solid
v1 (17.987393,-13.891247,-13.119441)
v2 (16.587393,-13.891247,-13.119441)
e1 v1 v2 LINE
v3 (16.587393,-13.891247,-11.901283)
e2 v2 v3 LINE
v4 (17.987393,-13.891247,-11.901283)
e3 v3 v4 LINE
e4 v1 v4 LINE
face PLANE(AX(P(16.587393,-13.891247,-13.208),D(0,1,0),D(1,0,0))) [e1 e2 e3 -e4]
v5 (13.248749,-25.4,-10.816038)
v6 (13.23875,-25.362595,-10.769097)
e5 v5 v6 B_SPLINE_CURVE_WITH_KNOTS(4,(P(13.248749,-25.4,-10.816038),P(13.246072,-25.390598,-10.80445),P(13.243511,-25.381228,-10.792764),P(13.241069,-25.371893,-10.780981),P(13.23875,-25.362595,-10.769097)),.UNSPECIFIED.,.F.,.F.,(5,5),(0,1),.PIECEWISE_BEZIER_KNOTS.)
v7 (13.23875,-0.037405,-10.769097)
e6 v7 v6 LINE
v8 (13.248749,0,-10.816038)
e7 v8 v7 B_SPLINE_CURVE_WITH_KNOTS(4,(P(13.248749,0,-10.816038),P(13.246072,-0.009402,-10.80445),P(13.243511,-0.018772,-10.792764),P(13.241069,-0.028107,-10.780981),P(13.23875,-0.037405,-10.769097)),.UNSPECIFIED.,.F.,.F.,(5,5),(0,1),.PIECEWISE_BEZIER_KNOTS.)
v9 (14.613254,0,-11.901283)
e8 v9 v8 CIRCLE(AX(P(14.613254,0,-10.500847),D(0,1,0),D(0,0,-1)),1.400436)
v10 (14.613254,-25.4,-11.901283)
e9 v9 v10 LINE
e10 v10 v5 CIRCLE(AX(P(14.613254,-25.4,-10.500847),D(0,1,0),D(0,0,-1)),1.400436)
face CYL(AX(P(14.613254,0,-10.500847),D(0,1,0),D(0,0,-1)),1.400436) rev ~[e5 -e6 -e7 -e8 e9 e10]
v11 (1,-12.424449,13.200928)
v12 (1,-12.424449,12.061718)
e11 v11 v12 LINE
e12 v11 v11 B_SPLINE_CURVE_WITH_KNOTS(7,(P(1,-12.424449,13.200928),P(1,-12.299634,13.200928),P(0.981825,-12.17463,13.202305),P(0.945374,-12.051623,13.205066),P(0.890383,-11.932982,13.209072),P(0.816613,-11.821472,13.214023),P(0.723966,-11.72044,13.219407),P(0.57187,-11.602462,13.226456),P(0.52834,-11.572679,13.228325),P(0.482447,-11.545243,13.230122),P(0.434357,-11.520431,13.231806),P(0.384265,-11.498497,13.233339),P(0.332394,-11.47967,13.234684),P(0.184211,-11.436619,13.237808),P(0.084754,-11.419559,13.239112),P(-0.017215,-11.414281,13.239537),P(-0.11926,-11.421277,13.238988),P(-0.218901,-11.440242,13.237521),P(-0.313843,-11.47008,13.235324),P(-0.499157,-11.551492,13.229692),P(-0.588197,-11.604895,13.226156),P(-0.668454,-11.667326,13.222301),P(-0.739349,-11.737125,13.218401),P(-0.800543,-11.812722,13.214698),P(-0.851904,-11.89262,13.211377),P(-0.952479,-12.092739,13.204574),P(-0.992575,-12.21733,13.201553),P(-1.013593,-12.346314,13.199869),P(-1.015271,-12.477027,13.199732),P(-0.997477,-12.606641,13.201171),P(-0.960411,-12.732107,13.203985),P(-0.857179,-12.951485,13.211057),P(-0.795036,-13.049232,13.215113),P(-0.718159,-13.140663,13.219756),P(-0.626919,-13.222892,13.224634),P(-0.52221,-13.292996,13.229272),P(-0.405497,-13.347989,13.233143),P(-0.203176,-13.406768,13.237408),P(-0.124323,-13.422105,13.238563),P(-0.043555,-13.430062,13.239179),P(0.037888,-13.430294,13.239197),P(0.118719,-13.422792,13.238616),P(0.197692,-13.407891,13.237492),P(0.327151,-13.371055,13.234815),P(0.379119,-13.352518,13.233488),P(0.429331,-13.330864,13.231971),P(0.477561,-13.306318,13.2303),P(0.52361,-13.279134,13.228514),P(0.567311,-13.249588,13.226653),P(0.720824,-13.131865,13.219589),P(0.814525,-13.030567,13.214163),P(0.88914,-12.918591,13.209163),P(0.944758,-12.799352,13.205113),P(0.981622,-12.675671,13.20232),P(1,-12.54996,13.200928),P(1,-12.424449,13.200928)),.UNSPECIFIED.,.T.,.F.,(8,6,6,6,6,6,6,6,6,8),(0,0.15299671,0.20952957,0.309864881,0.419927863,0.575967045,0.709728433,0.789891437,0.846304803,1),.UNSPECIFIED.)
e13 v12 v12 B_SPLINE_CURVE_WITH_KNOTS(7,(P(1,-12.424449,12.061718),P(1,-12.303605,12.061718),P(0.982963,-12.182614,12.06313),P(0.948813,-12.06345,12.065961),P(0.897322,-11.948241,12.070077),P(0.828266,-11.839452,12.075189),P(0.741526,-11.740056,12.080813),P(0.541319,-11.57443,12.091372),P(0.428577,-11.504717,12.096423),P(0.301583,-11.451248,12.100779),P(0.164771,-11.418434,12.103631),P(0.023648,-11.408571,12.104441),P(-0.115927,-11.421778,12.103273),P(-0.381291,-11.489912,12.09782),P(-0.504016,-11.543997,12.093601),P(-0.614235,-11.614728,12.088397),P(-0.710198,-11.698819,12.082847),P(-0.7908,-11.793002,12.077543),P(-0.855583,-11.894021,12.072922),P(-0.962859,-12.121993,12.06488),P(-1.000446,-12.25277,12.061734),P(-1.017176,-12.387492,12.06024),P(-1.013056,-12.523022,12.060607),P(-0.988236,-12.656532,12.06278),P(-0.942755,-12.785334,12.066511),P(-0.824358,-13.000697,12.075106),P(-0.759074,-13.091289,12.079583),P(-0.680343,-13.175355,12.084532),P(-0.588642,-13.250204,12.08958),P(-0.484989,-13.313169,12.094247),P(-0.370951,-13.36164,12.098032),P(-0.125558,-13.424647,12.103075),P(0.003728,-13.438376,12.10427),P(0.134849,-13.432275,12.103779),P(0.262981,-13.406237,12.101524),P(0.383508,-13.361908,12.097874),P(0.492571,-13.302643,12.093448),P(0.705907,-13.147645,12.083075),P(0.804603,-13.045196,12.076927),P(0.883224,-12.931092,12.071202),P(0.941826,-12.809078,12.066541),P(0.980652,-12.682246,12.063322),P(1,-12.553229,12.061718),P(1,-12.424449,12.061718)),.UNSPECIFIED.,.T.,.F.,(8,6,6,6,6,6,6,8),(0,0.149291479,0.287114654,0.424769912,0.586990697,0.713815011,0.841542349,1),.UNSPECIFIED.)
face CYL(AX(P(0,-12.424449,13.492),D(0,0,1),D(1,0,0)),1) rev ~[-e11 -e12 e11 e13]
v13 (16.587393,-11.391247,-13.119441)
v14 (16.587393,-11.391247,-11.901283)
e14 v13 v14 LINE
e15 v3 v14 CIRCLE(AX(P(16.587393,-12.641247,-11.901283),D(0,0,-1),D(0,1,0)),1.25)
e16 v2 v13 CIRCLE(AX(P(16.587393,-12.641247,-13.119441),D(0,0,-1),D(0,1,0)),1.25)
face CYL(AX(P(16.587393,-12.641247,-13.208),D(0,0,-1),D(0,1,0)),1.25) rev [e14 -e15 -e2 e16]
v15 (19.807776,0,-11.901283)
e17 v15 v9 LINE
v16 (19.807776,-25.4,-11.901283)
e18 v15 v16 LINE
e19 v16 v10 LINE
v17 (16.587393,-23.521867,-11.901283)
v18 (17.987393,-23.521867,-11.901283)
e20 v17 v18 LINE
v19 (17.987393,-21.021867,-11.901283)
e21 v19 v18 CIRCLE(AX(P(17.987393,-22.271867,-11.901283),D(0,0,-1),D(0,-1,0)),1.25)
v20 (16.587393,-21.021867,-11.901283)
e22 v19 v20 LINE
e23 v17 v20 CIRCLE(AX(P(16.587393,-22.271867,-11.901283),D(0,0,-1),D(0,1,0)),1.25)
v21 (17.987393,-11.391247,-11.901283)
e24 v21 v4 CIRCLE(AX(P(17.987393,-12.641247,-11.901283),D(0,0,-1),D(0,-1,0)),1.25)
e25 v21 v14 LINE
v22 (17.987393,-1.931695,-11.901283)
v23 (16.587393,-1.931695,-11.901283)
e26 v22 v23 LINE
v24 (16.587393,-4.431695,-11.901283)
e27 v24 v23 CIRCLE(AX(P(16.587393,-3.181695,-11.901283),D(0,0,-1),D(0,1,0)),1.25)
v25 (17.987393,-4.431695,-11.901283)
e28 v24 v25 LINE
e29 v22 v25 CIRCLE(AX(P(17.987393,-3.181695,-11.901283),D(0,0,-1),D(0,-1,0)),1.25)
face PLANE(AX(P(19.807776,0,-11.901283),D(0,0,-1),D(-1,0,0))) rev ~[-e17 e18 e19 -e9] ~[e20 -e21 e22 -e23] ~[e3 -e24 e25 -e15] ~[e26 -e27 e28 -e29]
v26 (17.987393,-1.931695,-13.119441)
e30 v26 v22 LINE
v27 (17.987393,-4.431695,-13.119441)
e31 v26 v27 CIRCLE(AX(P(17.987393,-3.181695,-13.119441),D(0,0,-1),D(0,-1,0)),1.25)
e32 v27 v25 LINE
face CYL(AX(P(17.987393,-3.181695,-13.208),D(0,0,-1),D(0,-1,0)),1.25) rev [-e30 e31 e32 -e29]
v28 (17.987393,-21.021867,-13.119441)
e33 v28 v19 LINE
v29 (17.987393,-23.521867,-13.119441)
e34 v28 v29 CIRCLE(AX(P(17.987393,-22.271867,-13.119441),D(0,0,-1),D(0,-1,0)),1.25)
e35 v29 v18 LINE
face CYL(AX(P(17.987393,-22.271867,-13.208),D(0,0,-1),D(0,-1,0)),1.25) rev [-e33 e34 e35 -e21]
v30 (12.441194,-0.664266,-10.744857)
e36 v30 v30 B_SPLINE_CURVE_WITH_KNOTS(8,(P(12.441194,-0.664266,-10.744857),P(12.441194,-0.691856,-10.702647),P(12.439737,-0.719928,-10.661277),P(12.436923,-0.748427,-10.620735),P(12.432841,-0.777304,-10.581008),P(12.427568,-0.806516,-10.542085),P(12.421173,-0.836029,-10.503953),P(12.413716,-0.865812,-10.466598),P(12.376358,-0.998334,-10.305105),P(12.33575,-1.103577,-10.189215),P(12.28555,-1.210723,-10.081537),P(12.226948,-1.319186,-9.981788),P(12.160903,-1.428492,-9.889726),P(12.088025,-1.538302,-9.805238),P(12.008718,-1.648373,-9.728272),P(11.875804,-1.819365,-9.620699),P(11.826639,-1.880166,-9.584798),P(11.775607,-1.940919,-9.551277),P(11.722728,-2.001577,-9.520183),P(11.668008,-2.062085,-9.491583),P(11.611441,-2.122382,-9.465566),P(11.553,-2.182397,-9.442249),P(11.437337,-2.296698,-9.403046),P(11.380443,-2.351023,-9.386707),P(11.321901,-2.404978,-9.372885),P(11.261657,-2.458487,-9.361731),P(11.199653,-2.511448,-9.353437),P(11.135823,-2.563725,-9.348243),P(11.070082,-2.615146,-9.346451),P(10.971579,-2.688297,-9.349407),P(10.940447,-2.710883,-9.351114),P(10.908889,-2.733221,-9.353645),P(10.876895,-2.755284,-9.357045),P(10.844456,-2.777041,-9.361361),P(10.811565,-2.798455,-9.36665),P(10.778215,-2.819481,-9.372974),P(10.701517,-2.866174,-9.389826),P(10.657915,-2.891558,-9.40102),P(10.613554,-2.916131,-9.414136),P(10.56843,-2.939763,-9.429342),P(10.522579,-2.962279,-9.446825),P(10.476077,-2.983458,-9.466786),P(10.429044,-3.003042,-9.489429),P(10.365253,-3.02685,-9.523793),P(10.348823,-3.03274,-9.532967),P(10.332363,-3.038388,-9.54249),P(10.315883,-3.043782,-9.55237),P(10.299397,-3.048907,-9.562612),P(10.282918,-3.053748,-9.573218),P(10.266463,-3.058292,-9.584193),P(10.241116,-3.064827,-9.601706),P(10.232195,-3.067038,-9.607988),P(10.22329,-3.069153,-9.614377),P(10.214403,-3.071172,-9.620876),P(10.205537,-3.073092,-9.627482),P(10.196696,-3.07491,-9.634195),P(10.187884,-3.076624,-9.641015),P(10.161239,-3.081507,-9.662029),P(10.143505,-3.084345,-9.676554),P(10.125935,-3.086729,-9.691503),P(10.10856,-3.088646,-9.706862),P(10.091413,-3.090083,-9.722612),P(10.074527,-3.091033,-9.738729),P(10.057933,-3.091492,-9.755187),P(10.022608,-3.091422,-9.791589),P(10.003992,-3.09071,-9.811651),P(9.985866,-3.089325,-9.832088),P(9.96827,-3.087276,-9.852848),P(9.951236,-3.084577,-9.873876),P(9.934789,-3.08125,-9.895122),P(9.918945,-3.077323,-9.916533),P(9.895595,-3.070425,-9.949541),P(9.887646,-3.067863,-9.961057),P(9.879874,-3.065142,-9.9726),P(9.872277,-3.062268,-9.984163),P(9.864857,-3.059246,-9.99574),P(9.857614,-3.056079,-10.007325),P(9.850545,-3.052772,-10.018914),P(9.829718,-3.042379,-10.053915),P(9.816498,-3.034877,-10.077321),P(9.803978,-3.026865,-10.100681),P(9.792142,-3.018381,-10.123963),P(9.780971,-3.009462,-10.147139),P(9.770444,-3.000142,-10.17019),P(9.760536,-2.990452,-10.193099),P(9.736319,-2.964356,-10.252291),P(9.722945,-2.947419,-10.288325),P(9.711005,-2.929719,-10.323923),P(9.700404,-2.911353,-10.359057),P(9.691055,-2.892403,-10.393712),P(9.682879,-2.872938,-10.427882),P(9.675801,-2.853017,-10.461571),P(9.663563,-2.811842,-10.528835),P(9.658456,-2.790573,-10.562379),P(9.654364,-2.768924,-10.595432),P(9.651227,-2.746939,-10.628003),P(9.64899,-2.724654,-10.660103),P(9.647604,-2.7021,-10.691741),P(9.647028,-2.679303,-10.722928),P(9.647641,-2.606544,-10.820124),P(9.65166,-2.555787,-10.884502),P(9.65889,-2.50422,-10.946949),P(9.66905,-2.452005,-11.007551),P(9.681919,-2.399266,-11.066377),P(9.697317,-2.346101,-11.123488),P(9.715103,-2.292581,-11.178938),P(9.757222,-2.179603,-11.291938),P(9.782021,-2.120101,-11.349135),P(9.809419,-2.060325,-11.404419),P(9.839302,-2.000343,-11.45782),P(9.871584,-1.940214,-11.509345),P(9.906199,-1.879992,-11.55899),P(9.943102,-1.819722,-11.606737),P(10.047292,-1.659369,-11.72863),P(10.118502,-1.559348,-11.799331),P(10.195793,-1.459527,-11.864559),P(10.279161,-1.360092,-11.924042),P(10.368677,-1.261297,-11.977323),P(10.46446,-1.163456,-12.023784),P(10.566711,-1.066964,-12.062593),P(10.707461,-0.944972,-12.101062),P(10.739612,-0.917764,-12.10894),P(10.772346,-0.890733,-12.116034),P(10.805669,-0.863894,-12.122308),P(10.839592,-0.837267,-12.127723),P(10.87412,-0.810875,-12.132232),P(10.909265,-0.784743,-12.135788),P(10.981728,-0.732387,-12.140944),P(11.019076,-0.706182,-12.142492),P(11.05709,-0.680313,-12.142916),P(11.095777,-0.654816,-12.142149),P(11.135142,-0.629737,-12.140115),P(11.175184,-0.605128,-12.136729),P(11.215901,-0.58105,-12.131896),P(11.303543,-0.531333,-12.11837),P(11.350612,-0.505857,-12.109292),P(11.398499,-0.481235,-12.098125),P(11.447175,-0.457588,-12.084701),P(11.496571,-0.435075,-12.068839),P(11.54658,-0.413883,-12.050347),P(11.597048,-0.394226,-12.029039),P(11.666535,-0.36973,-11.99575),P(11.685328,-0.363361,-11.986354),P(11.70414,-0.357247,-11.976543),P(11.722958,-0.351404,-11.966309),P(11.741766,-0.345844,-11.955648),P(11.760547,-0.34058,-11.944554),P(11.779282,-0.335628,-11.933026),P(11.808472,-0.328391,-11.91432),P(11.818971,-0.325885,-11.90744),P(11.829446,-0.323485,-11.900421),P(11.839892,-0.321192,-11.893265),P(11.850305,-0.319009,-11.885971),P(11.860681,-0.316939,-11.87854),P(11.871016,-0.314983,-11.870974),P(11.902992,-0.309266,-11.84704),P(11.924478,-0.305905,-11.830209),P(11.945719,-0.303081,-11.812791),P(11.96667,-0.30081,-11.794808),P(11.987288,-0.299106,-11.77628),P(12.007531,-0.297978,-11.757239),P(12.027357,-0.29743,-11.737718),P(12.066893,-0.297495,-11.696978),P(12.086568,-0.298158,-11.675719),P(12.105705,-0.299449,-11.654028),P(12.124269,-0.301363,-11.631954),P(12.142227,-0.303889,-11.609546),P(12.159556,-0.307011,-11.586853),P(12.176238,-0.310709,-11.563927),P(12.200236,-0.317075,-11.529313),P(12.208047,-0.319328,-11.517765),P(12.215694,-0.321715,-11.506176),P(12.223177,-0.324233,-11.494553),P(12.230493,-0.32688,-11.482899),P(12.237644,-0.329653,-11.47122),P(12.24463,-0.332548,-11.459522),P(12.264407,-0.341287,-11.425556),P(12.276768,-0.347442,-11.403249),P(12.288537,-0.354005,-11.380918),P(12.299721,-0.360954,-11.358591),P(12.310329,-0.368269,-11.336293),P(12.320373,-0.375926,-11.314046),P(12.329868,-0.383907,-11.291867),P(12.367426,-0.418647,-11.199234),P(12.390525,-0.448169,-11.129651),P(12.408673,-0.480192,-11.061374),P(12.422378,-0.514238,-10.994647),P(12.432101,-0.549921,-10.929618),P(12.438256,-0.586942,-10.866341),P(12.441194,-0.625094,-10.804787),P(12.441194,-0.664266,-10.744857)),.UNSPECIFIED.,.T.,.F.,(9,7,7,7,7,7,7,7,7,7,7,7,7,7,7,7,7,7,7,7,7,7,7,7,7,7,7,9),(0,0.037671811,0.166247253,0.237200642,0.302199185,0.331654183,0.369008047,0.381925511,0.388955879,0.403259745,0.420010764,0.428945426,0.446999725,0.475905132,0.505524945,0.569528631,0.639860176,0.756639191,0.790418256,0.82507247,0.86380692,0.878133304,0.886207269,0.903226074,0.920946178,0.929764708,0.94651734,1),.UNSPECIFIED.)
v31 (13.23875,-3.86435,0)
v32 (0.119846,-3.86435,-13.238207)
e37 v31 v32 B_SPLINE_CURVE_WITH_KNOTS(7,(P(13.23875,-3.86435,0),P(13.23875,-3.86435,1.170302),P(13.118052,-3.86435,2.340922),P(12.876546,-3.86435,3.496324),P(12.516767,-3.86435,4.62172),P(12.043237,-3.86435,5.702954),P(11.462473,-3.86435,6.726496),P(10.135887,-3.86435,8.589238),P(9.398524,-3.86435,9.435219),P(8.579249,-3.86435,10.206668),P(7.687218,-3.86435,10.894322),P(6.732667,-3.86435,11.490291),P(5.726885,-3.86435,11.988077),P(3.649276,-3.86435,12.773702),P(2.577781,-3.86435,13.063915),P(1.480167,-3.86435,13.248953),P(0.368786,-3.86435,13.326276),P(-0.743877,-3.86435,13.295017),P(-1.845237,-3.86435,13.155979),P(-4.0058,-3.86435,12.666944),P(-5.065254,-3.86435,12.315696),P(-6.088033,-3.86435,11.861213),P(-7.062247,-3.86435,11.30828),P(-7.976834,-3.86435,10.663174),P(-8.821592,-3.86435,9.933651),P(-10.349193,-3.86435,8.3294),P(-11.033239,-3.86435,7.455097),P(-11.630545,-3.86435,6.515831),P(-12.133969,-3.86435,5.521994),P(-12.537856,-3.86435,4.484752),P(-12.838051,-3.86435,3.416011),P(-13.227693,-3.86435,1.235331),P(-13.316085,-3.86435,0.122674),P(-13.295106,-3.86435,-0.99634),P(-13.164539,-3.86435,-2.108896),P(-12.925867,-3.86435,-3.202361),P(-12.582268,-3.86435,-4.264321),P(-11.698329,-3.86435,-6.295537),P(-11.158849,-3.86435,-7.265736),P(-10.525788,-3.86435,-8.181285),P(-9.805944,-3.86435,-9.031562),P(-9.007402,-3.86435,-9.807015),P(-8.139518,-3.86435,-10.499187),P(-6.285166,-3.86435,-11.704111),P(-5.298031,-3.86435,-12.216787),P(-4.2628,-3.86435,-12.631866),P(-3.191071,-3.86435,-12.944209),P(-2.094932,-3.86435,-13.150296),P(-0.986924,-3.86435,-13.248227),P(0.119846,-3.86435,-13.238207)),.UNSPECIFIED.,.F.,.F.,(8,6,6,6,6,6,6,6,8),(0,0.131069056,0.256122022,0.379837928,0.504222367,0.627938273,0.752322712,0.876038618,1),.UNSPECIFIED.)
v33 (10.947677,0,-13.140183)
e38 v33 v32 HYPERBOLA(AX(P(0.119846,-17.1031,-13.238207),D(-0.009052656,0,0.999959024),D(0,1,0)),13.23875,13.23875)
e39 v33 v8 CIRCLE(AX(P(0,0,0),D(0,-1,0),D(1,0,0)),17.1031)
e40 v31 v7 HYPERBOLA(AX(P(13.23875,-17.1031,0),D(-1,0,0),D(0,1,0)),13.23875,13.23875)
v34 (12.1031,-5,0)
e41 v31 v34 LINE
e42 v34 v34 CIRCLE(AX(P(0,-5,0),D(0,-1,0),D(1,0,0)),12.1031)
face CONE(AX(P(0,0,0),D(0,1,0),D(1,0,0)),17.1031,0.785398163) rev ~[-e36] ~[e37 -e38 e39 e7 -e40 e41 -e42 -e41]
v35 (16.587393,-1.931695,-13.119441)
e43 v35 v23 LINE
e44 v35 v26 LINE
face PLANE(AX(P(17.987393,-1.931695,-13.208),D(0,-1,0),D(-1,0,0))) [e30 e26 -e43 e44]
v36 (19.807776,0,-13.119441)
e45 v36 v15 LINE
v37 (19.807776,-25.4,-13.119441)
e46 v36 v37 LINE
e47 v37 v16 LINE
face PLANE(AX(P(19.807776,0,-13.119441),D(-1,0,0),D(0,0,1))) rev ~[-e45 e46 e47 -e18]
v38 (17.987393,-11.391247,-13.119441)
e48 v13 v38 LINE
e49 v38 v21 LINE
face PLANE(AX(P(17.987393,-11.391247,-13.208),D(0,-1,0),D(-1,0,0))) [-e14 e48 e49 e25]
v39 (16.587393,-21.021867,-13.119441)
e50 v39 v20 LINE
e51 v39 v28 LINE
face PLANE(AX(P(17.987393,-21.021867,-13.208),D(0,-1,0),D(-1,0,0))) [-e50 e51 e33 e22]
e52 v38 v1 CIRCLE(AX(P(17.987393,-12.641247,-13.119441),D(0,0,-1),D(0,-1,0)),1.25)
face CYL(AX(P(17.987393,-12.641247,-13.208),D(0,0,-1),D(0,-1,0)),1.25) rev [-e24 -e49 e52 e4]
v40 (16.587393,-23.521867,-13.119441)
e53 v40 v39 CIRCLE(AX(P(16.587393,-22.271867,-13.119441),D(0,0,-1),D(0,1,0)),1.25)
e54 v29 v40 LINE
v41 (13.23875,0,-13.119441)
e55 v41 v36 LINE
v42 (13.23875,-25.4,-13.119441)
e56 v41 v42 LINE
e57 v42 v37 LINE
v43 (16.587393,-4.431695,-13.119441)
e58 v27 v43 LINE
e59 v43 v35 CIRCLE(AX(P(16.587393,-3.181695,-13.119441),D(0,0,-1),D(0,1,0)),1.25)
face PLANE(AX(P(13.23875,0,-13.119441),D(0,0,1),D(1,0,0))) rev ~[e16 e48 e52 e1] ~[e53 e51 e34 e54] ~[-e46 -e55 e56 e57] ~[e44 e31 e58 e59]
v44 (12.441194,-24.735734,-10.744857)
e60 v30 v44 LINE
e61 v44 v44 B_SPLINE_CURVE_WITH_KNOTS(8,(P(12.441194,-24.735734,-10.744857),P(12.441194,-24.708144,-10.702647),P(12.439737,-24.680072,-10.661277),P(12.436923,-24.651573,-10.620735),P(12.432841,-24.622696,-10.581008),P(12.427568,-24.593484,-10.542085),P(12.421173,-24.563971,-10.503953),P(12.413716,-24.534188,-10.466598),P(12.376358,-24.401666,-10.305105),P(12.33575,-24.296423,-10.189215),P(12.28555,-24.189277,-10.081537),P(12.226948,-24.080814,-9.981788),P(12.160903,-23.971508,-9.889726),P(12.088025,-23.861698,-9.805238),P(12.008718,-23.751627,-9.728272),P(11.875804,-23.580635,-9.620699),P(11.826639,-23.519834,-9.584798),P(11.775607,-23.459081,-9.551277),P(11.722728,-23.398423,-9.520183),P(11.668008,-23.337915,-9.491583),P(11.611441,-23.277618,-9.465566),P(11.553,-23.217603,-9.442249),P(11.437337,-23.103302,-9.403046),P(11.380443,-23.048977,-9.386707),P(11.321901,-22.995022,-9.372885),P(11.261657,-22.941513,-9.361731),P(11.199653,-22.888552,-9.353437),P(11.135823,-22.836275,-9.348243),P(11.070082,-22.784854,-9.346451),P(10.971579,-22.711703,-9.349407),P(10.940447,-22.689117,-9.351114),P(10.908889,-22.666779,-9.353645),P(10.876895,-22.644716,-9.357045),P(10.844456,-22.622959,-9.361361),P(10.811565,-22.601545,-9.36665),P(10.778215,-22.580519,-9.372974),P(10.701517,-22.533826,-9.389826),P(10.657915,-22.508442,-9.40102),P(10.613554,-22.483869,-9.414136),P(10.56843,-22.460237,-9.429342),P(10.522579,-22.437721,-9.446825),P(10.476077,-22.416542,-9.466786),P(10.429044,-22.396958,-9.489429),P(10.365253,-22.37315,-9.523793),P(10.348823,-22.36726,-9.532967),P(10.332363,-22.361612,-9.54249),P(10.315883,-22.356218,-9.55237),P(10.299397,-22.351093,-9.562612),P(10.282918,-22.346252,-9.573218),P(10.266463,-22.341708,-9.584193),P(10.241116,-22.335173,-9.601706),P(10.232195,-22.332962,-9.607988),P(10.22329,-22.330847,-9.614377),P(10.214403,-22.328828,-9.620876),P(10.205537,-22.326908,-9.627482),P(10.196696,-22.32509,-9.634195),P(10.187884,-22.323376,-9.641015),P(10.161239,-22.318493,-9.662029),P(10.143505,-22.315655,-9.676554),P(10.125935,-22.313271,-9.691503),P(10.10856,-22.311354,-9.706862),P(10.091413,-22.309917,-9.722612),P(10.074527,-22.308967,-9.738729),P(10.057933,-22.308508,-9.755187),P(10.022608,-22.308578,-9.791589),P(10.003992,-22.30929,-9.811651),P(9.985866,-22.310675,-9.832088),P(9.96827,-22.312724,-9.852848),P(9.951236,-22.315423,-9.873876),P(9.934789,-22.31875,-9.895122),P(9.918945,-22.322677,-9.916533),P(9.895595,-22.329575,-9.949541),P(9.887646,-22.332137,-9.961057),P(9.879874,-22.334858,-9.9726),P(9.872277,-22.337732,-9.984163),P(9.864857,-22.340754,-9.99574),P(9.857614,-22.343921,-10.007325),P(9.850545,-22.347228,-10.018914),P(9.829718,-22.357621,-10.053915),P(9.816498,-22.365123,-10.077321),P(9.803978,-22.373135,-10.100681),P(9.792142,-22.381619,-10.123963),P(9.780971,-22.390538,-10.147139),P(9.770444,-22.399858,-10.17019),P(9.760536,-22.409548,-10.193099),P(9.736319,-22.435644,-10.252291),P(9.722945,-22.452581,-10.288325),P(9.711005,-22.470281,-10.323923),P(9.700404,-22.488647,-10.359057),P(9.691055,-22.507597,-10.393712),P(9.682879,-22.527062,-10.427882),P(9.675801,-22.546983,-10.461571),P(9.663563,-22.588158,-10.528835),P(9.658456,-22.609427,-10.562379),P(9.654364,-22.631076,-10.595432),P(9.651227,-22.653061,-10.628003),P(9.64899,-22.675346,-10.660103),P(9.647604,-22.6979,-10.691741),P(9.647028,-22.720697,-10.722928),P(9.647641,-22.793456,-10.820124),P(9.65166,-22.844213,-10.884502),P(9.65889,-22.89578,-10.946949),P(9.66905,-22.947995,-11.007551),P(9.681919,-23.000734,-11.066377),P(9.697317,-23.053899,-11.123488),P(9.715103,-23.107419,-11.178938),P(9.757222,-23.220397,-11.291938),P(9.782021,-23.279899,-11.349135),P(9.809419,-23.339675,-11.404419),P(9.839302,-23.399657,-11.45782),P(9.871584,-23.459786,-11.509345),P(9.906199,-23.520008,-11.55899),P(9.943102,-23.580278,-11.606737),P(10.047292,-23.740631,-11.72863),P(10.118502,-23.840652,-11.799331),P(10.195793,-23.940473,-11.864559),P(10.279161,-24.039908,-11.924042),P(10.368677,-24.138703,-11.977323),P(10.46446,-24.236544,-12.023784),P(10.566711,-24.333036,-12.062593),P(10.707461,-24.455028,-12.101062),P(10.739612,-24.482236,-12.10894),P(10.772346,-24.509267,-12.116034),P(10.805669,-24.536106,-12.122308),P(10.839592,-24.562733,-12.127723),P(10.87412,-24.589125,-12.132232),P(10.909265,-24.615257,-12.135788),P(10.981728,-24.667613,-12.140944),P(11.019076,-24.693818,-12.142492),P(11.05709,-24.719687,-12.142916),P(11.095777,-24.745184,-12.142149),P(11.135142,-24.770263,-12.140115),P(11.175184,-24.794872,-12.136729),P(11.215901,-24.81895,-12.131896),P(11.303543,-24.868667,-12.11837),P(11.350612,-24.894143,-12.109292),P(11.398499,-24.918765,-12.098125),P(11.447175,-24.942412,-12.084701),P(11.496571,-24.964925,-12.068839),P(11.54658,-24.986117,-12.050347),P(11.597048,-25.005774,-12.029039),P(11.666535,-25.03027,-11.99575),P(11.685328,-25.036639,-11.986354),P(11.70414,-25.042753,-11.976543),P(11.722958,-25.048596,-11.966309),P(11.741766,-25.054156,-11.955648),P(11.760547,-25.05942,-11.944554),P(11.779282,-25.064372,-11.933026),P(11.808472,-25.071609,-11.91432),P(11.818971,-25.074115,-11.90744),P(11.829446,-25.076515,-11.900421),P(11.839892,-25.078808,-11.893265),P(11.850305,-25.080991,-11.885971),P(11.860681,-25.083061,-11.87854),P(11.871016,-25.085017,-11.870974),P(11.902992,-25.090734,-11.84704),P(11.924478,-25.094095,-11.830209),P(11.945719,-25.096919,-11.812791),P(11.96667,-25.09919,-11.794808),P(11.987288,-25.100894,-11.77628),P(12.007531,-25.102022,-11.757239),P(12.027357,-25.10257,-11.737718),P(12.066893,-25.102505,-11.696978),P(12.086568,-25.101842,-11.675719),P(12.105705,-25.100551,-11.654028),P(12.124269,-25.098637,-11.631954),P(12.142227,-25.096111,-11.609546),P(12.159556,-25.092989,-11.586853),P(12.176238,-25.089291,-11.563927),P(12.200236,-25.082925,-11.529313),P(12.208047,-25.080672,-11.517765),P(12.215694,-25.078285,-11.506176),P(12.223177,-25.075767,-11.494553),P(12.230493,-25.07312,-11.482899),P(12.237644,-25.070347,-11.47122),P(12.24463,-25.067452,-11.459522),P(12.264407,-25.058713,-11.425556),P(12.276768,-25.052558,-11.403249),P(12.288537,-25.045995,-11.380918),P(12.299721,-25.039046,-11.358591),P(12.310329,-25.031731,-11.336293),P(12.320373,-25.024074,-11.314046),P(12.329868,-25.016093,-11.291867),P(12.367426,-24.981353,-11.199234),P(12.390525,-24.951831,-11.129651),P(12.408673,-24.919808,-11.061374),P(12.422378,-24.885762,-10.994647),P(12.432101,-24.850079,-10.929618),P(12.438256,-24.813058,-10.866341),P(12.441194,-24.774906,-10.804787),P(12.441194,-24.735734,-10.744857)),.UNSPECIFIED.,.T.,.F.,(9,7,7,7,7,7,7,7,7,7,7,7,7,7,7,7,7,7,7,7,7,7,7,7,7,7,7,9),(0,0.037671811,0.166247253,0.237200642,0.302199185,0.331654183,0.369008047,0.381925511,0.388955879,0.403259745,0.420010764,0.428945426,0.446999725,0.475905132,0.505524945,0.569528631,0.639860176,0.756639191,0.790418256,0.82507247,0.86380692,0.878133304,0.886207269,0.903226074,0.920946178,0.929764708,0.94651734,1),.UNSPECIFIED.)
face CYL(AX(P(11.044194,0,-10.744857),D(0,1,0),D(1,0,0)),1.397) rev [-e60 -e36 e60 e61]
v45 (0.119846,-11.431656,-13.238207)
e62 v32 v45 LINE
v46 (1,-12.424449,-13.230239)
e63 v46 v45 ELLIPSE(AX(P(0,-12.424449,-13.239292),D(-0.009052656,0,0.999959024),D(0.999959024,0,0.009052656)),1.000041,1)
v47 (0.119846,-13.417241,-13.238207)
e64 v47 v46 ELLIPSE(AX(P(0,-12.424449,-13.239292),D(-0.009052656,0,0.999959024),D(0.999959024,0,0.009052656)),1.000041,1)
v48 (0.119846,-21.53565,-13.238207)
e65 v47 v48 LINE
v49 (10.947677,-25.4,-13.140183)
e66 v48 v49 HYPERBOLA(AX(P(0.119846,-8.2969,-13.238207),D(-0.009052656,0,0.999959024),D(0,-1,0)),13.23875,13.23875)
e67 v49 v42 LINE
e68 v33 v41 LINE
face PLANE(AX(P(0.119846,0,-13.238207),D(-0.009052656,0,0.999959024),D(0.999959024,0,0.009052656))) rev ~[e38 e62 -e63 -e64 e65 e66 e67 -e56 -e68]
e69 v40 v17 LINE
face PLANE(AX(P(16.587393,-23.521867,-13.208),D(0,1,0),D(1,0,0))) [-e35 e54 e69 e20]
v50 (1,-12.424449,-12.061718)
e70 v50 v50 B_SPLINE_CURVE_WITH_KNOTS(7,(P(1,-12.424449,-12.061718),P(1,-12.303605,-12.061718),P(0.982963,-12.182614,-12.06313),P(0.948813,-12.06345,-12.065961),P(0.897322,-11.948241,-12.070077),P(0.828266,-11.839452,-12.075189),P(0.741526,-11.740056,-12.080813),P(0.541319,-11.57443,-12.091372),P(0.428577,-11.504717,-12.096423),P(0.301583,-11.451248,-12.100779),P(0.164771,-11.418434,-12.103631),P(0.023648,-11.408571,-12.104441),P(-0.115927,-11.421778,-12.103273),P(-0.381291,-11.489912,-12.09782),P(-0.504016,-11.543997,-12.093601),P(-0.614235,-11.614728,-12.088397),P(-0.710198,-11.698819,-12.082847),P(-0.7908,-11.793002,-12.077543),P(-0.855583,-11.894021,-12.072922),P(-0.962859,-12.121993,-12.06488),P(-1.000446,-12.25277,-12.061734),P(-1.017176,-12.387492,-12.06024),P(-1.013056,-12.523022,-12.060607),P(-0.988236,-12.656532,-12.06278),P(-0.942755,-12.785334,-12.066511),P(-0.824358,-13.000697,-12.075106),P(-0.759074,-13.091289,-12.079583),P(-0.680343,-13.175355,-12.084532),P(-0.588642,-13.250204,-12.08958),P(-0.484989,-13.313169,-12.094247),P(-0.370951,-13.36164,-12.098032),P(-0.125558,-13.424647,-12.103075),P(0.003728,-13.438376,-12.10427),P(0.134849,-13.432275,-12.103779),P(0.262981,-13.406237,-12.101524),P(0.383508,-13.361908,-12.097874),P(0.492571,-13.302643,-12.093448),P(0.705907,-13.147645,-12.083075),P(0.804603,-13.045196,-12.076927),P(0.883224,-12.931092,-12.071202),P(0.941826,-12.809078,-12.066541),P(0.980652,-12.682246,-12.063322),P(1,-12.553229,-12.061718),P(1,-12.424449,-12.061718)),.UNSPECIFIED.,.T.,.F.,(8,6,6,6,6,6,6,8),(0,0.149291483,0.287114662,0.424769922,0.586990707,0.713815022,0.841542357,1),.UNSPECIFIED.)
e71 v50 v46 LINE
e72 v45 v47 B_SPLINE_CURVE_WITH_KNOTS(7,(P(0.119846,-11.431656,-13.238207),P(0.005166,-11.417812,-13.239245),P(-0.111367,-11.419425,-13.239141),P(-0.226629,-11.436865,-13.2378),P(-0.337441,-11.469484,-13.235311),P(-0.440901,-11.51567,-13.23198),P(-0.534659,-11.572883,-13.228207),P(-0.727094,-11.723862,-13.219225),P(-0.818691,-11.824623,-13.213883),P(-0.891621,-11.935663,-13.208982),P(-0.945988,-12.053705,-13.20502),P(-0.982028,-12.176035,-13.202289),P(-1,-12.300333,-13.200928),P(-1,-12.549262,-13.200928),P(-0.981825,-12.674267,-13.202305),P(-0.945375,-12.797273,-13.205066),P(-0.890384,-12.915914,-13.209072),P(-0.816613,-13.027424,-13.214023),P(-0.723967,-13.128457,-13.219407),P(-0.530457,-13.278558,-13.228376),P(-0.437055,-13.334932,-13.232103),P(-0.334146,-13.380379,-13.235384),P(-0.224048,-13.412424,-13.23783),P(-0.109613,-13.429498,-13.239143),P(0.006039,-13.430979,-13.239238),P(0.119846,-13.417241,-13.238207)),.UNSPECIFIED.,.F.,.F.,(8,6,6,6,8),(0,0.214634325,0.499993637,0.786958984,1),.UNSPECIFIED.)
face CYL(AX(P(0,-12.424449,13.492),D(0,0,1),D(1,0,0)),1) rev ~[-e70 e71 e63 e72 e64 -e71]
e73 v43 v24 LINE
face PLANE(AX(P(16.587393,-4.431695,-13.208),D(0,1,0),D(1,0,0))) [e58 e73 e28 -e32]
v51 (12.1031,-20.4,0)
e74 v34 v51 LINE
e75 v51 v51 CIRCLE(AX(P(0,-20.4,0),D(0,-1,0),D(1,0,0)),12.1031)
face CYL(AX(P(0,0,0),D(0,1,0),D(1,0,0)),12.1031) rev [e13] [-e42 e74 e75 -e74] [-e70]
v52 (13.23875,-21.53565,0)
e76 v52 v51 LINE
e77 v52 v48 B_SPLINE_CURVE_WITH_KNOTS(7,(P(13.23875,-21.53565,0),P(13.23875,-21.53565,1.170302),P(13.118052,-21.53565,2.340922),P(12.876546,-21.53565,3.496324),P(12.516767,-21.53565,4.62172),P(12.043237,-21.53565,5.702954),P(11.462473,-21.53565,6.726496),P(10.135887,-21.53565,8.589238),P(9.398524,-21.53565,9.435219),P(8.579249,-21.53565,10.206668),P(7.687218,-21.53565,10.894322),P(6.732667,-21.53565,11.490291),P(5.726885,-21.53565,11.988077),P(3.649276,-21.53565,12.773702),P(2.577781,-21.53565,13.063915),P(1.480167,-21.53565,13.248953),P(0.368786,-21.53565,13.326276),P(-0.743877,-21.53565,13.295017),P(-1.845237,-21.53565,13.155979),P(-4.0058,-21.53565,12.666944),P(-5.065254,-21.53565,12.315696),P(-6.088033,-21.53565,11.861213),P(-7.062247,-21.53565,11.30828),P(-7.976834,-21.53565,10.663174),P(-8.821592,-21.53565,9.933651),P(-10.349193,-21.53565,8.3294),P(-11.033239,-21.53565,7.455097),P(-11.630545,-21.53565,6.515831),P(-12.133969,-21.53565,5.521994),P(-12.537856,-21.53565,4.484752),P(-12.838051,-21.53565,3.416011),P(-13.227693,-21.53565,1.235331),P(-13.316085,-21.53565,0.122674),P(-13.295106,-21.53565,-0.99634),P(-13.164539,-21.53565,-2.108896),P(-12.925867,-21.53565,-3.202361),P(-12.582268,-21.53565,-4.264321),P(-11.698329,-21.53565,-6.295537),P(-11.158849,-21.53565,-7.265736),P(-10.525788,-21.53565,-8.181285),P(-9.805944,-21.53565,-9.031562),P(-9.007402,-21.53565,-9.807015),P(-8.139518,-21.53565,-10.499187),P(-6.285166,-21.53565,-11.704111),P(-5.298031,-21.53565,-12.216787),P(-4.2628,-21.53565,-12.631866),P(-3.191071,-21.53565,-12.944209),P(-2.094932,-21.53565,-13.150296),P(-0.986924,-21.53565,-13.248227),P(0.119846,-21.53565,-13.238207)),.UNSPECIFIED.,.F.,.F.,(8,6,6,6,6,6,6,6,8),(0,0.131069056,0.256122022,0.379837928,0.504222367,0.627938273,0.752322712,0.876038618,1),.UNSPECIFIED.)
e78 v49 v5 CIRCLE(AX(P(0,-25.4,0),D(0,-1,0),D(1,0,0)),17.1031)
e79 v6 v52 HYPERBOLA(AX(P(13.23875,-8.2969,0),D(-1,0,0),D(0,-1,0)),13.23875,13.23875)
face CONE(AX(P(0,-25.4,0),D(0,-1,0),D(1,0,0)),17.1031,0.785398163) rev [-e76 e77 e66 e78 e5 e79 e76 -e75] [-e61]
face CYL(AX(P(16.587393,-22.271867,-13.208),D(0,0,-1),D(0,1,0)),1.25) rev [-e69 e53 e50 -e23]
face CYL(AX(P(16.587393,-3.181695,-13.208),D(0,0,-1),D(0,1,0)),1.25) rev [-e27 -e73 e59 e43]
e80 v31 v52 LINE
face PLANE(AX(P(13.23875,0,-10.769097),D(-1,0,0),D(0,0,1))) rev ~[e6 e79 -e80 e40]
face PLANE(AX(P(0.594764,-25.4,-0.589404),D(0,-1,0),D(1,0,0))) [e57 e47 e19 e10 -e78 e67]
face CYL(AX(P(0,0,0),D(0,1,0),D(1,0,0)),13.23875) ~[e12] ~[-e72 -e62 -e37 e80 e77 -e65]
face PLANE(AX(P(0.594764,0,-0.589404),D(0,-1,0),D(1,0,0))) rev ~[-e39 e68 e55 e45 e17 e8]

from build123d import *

# Parameters (mm, degrees)
F0_R     = 12.1031
F0_R_2   = 1.397
F1_DEPTH = 25.4
F4_DEPTH = 1.7
F8_R     = 1
F9_DEPTH = 27.8


# Not quite as in the source:
# - a fillet or chamfer that OpenCascade refuses, or shapes differently, is made with other operations: its cross-section is extruded or revolved along the edge and cut away or added


with BuildPart() as f1:
    # F0 (on Front) → F1 (new body)
    with BuildSketch(Plane.XZ):
        with BuildLine():
            ThreePointArc((0.1198459876, -13.2382072509), (9.403486197, -9.3187414184), (13.2387497249, 0))
            ThreePointArc((13.2387497249, 0), (-9.403486197, 9.3187414184), (0.1198459876, -13.2382072509))
        make_face()
        Circle(F0_R, mode=Mode.SUBTRACT)
        with BuildLine():
            Line((13.2387497249, -10.7690971345), (13.2387497249, 0))
            ThreePointArc((13.2387497249, 0), (9.403486197, -9.3187414184), (0.1198459876, -13.2382072509))
            Line((0.1198459876, -13.2382072509), (13.2387497249, -13.1194414571))
            Line((13.2387497249, -13.1194414571), (13.2387497249, -10.7690971345))
        make_face()
        with Locations((11.0441939905, -10.7448566705)):
            Circle(F0_R_2, mode=Mode.SUBTRACT)
        with BuildLine():
            ThreePointArc((14.6132539958, -11.9012827054), (13.7228739986, -11.5817927037), (13.2387497249, -10.7690971345))
            Line((13.2387497249, -10.7690971345), (13.2387497249, -13.1194414571))
            Line((13.2387497249, -13.1194414571), (19.8077764362, -13.1194414571))
            Line((19.8077764362, -13.1194414571), (19.8077764362, -11.9012827054))
            Line((19.8077764362, -11.9012827054), (14.6132539958, -11.9012827054))
        make_face()
    extrude(amount=F1_DEPTH)

    # F3 (on offset) → F4 (cut)
    with BuildSketch(Plane.XY.offset(-13.208)):
        with BuildLine():
            Line((16.5873928428, -4.4316952396), (17.9873928428, -4.4316952396))
            ThreePointArc((17.9873928428, -4.4316952396), (19.2373928428, -3.1816952396), (17.9873928428, -1.9316952396))
            Line((17.9873928428, -1.9316952396), (16.5873928428, -1.9316952396))
            ThreePointArc((16.5873928428, -1.9316952396), (15.3373928428, -3.1816952396), (16.5873928428, -4.4316952396))
        make_face()
        with BuildLine():
            Line((16.5873928428, -13.8912473619), (17.9873928428, -13.8912473619))
            ThreePointArc((17.9873928428, -13.8912473619), (19.2373928428, -12.6412473619), (17.9873928428, -11.3912473619))
            Line((17.9873928428, -11.3912473619), (16.5873928428, -11.3912473619))
            ThreePointArc((16.5873928428, -11.3912473619), (15.3373928428, -12.6412473619), (16.5873928428, -13.8912473619))
        make_face()
        with BuildLine():
            Line((16.5873928428, -23.5218666773), (17.9873928428, -23.5218666773))
            ThreePointArc((17.9873928428, -23.5218666773), (19.2373928428, -22.2718666773), (17.9873928428, -21.0218666773))
            Line((17.9873928428, -21.0218666773), (16.5873928428, -21.0218666773))
            ThreePointArc((16.5873928428, -21.0218666773), (15.3373928428, -22.2718666773), (16.5873928428, -23.5218666773))
        make_face()
    extrude(amount=F4_DEPTH, mode=Mode.SUBTRACT)

    # F5: chamfer of 5 on 1 edges, made by hand

    # F5_s1 → F5_t2 (revolve, cut)
    with BuildSketch(Plane.XY):
        Polygon((17.1031, -25.4), (12.1031, -20.4), (12.1031, -25.4), align=None)
    revolve(axis=Axis((0, -25.4, 0), (0, -1, 0)), mode=Mode.SUBTRACT)

    # F6: chamfer of 5 on 1 edges, made by hand

    # F6_s1 → F6_t2 (revolve, cut)
    with BuildSketch(Plane.XY):
        Polygon((17.1031, 0), (12.1031, -5), (12.1031, 0), align=None)
    revolve(axis=Axis((0, 0, 0), (0, -1, 0)), mode=Mode.SUBTRACT)

    # F8 (on offset) → F9 (cut)
    with BuildSketch(Plane.XY.offset(13.492)):
        with Locations((0, -12.424448505)):
            Circle(F8_R)
    extrude(amount=-F9_DEPTH, mode=Mode.SUBTRACT)


solid = f1.part
